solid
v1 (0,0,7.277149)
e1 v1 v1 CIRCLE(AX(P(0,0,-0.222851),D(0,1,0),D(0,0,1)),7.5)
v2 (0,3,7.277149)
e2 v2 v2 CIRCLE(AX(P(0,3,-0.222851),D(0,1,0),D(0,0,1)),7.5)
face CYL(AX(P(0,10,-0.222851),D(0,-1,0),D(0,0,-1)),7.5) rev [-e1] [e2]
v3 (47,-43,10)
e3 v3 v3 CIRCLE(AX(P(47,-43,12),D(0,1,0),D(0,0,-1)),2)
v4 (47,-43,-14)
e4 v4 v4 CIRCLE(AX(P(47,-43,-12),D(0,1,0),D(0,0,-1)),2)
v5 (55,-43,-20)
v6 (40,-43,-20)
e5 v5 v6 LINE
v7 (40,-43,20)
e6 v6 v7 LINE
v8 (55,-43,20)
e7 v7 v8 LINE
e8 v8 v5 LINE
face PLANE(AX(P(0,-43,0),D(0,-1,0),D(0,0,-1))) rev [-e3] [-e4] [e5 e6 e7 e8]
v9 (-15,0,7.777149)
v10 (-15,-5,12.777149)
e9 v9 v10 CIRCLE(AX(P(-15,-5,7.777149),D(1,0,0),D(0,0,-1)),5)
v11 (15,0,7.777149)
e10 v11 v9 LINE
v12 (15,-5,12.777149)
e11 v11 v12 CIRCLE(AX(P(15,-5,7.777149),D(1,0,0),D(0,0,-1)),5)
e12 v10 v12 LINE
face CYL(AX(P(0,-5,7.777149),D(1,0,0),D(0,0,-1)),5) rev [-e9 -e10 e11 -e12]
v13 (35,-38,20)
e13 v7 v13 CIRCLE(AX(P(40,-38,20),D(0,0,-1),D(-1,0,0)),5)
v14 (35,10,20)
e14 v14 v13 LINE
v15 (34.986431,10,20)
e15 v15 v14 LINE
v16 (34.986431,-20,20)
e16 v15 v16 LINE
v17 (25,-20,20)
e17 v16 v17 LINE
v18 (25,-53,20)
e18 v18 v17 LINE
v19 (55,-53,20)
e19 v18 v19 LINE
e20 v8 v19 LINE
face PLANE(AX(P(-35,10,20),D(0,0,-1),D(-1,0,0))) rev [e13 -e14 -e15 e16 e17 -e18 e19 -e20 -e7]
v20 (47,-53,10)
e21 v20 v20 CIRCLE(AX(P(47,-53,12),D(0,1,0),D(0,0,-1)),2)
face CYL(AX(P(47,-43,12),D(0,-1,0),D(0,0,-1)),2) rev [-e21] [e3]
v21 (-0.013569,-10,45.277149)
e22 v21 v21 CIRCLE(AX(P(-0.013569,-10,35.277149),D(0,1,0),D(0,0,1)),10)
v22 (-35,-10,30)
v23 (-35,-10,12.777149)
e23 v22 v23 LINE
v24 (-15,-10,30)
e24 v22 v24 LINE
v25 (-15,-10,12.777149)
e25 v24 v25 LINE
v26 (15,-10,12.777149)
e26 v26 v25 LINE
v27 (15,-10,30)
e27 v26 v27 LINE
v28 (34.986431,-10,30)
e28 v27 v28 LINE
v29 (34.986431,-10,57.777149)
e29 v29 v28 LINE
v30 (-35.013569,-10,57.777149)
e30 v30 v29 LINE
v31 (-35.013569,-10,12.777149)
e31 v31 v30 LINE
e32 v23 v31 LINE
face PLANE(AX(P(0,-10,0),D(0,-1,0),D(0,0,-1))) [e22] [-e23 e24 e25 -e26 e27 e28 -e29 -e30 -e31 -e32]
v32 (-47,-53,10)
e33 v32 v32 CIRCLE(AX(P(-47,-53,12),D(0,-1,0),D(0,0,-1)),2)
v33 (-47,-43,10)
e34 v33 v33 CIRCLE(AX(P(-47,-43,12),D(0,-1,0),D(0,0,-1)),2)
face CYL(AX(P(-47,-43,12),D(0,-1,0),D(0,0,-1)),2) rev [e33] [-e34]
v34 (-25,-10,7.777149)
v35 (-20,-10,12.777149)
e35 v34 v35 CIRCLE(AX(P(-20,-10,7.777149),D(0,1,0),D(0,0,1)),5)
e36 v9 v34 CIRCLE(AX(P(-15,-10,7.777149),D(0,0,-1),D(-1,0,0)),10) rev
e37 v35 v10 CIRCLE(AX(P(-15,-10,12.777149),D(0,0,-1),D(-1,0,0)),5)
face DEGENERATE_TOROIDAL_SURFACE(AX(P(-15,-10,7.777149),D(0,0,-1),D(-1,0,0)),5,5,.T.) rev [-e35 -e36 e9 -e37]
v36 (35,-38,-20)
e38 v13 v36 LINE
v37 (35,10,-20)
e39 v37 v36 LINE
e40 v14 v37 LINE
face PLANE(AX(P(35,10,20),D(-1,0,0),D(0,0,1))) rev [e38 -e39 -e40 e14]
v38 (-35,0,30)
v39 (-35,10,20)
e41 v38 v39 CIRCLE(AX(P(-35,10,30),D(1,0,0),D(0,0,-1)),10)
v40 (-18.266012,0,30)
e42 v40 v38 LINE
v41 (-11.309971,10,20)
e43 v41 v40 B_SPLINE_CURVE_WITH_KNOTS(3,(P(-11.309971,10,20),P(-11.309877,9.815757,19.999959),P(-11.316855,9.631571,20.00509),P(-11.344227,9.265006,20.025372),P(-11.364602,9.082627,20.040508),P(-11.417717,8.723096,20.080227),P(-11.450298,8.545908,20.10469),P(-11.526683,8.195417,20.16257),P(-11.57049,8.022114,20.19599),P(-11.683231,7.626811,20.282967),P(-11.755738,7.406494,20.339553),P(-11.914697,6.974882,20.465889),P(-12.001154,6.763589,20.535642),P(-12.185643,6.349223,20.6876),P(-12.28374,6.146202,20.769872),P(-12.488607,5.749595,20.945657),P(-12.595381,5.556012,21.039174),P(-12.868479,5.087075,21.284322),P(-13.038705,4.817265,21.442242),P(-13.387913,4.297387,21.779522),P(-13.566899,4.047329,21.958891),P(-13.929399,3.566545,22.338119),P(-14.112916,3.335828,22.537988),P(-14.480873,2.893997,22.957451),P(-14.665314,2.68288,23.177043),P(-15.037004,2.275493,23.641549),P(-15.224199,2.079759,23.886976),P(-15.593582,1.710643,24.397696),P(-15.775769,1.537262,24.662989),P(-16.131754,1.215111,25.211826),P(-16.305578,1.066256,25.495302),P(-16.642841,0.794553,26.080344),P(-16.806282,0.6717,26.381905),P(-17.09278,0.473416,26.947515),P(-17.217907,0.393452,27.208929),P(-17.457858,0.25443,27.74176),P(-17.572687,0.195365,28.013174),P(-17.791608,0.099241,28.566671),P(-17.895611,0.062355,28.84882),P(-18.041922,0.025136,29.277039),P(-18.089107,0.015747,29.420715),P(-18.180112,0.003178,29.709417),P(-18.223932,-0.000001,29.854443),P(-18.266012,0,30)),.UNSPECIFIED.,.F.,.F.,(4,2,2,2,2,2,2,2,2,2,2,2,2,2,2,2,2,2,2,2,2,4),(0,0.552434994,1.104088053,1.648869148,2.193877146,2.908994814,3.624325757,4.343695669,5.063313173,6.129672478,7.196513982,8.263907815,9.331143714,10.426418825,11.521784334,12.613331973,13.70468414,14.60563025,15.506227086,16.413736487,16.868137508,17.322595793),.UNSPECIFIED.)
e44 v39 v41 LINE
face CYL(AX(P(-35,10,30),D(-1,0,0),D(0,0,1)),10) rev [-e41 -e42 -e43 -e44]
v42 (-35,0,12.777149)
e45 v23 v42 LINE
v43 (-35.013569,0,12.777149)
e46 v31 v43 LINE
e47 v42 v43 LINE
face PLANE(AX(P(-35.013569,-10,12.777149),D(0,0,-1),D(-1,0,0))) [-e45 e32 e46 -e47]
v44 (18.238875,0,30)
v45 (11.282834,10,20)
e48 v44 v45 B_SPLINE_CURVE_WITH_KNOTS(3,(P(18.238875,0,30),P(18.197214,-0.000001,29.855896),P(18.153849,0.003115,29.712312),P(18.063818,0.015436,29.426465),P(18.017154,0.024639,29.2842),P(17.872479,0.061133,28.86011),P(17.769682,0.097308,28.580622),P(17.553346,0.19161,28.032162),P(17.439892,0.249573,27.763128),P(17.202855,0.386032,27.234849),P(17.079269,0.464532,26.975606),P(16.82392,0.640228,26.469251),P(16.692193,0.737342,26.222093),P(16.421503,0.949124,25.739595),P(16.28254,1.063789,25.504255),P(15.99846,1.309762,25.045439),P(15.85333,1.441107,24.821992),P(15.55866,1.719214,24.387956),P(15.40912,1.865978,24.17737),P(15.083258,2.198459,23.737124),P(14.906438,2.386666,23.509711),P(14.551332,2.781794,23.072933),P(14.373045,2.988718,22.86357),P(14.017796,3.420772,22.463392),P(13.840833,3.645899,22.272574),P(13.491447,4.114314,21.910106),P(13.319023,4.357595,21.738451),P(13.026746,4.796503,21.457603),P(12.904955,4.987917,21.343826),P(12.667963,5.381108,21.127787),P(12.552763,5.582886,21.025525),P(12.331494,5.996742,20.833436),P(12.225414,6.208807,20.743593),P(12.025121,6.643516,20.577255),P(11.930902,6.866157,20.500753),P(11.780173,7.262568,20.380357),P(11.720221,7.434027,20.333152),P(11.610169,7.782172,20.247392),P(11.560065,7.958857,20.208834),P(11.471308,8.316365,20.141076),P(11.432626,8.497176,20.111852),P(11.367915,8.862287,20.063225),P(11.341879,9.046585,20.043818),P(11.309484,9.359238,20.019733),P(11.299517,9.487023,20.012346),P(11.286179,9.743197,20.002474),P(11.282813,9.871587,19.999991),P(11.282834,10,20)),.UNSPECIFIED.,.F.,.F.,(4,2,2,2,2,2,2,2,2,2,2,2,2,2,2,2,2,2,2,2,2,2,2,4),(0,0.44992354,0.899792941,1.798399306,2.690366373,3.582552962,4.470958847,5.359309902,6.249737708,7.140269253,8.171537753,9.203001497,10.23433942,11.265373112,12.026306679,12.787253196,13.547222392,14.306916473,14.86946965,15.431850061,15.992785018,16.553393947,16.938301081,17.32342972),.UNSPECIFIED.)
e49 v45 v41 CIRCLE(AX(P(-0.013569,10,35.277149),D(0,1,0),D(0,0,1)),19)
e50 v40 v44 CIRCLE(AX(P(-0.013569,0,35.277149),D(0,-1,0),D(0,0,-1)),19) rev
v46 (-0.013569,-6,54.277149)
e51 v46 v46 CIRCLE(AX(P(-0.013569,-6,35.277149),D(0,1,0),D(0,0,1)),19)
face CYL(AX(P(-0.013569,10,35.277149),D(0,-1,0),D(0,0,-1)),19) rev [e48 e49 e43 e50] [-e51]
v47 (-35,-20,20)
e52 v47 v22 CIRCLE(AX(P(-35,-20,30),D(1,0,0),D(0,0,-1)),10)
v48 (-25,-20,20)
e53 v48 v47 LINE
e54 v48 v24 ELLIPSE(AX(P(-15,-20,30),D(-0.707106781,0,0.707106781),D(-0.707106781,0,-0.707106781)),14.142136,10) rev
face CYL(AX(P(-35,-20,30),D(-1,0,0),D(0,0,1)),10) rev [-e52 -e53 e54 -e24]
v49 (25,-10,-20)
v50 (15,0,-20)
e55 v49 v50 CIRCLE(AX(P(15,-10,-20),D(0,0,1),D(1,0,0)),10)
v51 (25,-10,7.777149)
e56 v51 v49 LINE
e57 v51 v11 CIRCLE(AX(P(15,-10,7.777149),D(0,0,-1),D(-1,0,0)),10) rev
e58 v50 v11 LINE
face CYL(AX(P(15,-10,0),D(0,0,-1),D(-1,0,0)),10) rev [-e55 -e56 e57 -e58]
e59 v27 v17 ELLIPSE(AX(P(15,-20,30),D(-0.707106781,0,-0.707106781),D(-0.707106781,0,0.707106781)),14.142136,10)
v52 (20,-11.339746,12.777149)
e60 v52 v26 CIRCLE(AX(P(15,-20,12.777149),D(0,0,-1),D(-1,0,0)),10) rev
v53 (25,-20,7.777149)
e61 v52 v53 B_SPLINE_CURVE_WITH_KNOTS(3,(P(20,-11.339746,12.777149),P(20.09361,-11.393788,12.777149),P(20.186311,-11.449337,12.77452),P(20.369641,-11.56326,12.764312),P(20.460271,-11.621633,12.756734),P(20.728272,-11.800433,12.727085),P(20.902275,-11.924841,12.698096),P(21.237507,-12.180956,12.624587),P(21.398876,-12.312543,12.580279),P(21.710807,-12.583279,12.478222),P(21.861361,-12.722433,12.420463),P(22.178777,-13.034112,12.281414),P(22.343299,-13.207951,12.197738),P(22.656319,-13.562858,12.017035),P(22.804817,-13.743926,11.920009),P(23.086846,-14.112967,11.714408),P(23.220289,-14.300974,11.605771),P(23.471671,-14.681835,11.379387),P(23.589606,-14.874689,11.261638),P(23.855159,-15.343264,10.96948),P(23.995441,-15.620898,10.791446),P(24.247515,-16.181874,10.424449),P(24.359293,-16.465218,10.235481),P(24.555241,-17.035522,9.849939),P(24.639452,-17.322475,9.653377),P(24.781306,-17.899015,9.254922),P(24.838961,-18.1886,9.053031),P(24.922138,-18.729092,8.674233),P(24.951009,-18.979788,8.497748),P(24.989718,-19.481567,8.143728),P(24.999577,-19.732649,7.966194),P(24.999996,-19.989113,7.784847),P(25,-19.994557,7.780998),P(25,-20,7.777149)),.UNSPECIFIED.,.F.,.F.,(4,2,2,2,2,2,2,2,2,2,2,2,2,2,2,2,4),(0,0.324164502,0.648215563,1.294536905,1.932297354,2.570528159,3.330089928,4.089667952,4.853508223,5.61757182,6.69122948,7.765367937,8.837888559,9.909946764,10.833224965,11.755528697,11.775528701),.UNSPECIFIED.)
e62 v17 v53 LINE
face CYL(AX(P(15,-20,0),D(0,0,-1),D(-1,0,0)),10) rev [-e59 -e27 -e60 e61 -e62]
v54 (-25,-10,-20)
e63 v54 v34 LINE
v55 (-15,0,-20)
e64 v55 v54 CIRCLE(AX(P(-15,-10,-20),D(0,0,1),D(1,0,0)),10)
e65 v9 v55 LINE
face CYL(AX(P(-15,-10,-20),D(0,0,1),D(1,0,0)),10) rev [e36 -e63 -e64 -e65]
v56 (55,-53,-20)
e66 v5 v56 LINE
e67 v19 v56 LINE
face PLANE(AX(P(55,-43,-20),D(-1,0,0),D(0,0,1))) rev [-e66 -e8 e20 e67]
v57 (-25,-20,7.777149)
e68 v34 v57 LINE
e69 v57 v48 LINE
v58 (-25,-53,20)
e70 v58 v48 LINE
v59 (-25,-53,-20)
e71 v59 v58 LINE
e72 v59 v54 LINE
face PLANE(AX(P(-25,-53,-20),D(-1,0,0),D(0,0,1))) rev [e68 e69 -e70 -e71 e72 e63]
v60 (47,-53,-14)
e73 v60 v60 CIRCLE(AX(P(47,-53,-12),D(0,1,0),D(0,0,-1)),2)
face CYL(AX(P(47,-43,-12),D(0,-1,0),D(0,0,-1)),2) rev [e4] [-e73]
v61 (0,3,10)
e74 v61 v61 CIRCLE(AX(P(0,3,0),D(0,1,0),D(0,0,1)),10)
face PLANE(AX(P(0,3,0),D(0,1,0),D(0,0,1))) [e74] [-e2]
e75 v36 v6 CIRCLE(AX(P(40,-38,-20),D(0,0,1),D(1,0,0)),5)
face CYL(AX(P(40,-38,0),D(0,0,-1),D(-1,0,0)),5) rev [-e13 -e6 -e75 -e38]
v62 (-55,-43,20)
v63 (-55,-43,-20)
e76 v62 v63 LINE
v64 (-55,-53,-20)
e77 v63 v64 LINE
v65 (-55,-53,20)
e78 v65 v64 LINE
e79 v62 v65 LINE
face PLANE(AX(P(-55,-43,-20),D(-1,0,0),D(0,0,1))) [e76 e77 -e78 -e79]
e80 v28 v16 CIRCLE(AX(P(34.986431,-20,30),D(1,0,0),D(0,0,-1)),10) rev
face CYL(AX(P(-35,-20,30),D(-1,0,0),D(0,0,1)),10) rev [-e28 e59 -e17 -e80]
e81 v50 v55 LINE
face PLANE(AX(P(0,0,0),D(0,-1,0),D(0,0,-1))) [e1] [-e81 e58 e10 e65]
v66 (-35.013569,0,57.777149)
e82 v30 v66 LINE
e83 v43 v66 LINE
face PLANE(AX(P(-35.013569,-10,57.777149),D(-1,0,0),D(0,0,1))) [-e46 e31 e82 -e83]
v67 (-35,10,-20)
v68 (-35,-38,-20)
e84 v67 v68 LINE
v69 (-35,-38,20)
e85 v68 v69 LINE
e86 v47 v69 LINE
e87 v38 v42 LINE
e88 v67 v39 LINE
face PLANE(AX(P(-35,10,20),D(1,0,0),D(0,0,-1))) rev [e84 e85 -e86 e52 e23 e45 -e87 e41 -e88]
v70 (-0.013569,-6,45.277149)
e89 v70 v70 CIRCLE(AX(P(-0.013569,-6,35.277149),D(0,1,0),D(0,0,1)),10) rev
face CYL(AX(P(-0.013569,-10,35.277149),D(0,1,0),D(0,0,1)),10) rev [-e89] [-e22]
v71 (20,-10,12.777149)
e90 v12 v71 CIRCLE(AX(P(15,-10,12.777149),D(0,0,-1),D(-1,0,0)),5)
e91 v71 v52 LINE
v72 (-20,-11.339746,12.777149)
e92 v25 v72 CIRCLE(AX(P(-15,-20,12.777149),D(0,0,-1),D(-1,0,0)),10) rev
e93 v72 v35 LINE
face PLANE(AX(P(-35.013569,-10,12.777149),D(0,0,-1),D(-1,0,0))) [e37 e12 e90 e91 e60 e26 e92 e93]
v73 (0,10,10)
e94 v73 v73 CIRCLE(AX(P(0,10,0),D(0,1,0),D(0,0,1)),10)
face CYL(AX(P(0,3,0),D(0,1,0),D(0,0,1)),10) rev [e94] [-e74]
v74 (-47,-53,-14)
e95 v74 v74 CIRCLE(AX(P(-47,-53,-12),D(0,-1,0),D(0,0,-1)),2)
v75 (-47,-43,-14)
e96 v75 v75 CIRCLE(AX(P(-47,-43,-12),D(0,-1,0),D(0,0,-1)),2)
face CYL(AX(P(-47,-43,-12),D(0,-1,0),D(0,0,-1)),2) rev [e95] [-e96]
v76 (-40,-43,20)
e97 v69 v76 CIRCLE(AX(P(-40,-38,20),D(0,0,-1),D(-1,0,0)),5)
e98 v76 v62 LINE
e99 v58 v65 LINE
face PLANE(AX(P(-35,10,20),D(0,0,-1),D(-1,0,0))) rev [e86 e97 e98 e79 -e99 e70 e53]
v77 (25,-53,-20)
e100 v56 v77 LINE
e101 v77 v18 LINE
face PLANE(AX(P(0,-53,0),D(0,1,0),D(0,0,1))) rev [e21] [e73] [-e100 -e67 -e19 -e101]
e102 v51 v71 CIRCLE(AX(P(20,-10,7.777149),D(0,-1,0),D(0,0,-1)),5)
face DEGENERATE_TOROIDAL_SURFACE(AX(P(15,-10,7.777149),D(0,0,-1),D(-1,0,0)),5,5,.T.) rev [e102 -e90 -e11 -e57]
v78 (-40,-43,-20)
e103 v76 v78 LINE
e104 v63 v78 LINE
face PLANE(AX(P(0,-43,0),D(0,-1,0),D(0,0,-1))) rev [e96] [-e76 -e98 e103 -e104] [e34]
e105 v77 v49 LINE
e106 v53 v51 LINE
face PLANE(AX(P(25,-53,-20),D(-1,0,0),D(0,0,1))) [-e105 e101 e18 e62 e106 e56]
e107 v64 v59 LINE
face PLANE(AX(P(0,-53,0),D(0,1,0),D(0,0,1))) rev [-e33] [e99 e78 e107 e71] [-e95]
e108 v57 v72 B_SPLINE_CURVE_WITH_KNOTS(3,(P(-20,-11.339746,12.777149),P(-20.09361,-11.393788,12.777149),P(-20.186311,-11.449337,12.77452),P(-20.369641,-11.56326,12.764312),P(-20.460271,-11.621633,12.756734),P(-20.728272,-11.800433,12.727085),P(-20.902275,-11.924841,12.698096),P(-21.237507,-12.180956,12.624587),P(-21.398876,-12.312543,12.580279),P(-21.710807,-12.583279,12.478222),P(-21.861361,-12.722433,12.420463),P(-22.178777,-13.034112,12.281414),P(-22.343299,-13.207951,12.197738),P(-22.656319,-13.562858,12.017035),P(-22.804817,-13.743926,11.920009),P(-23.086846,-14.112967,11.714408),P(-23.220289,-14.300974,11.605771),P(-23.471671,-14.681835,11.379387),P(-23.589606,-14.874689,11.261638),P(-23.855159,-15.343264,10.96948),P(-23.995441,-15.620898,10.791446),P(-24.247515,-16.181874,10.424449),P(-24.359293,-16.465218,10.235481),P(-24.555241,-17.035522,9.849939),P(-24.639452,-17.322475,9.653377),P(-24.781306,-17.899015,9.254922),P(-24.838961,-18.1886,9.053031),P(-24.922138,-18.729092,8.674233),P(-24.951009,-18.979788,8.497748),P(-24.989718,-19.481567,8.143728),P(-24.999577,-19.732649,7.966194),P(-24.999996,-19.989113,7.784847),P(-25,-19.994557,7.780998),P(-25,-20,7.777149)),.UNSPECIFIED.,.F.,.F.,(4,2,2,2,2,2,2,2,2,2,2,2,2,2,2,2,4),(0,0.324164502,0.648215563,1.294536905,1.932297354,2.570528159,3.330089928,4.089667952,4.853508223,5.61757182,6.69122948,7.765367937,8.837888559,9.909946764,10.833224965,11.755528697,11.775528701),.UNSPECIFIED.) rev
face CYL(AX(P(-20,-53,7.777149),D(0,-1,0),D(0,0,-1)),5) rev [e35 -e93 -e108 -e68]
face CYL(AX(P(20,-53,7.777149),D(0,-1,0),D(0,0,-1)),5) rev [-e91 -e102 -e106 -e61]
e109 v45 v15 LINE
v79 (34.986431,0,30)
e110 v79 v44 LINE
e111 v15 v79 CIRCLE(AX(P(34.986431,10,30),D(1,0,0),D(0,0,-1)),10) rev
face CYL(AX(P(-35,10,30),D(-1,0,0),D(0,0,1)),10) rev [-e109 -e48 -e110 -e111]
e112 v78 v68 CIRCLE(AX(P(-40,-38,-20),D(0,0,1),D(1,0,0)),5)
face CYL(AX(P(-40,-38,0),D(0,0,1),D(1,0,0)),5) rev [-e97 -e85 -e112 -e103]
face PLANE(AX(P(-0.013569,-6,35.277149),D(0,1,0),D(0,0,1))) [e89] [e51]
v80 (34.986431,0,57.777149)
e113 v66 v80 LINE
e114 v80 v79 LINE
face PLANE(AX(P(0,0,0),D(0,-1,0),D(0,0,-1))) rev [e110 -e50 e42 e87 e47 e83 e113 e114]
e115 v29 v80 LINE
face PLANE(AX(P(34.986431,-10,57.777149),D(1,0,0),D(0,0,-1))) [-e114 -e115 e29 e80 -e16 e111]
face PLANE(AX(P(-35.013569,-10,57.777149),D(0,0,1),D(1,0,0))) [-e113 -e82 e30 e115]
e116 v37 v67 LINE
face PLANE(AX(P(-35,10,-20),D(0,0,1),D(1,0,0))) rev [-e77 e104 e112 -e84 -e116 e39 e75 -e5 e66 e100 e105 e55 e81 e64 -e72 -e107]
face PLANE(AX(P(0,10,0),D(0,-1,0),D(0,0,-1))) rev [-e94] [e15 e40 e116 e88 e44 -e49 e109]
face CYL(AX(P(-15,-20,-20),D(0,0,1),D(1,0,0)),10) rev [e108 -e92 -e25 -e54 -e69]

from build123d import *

# Parameters (mm, degrees)
SKETCH1_W               = 70
SKETCH1_H               = 40
SKETCH1_R               = 7.5
BOSS_EXTRUDE2_DEPTH     = 10
SKETCH2_R               = 10
CUT_EXTRUDE1_DEPTH      = 7
SKETCH3_W               = 10
SKETCH3_H               = 40
BOSS_EXTRUDE3_DEPTH     = 53
SKETCH5_W               = 30
SKETCH5_H               = 40
BOSS_EXTRUDE4_DEPTH     = 10
SKETCH7_R               = 2
CUT_EXTRUDE2_DEPTH      = 10
FILLET5_R               = 5
FILLET6_R               = 5
SKETCH10_W              = 70
SKETCH10_H              = 45
SKETCH10_R              = 10
BOSS_EXTRUDE9_DEPTH     = 10
CUT_EXTRUDE3_DEPTH      = 96.771597908
CUT_EXTRUDE3_DEPTH_BACK = 6
SKETCH11_R              = 19
FILLET7_R               = 10
FILLET8_R               = 10
FILLET9_R               = 5


with BuildPart() as part:
    # Sketch1 → Boss-Extrude2 (new body)
    with BuildSketch(Plane(origin=(0, 0, 0), x_dir=(1, 0, 0), z_dir=(0, 1, 0))):
        Rectangle(SKETCH1_W, SKETCH1_H)
        with Locations(Location((0, 0.222850833, 0), (0, 0, 270))):
            Circle(SKETCH1_R, mode=Mode.SUBTRACT)
    extrude(amount=BOSS_EXTRUDE2_DEPTH)

    # Sketch2 → Cut-Extrude1 (cut)
    with BuildSketch(Plane(origin=(0, 10, 0), x_dir=(1, 0, 0), z_dir=(0, 1, 0))):
        with Locations(Location((0, 0, 0), (0, 0, 270))):
            Circle(SKETCH2_R)
    extrude(amount=-CUT_EXTRUDE1_DEPTH, mode=Mode.SUBTRACT)

    # Sketch3 → Boss-Extrude3 (add)
    with BuildSketch(Plane.XZ):
        with Locations((-30, 0)):
            Rectangle(SKETCH3_W, SKETCH3_H)
    boss_extrude3 = extrude(amount=BOSS_EXTRUDE3_DEPTH)

    # Sketch5 → Boss-Extrude4 (add)
    with BuildSketch(Plane.XZ.offset(53)):
        with Locations((-40, 0)):
            Rectangle(SKETCH5_W, SKETCH5_H)
    boss_extrude4 = extrude(amount=-BOSS_EXTRUDE4_DEPTH)

    # Sketch7 → Cut-Extrude2 (cut)
    with BuildSketch(Plane.XZ.offset(53)):
        with Locations(Location((-47, 12, 0), (0, 0, 270))):
            Circle(SKETCH7_R)
        with Locations(Location((-47, -12, 0), (0, 0, 270))):
            Circle(SKETCH7_R)
    cut_extrude2 = extrude(amount=-CUT_EXTRUDE2_DEPTH, mode=Mode.SUBTRACT)

    # Fillet5
    fillet5_edges = [part.edges().sort_by_distance(p)[0] for p in [
        (-35, -43, 0),
    ]]
    fillet(fillet5_edges, radius=FILLET5_R)

    # Mirror10: Boss-Extrude3, Boss-Extrude4, Cut-Extrude2 across plane
    add(boss_extrude3.mirror(Plane(origin=(0, 0, 0), x_dir=(0, 0, 1), z_dir=(1, 0, 0))))
    add(boss_extrude4.mirror(Plane(origin=(0, 0, 0), x_dir=(0, 0, 1), z_dir=(1, 0, 0))))
    add(cut_extrude2.mirror(Plane(origin=(0, 0, 0), x_dir=(0, 0, 1), z_dir=(1, 0, 0))), mode=Mode.SUBTRACT)

    # Fillet6
    fillet6_edges = [part.edges().sort_by_distance(p)[0] for p in [
        (35, -43, 0),
    ]]
    fillet(fillet6_edges, radius=FILLET6_R)

    # Sketch10 → Boss-Extrude9 (add)
    with BuildSketch(Plane(origin=(0, 0, 0), x_dir=(1, 0, 0), z_dir=(0, 1, 0))):
        with Locations((-0.013568797, -35.277149167)):
            Rectangle(SKETCH10_W, SKETCH10_H)
        with Locations(Location((-0.013568797, -35.277149167, 0), (0, 0, 270))):
            Circle(SKETCH10_R, mode=Mode.SUBTRACT)
    extrude(amount=-BOSS_EXTRUDE9_DEPTH)

    # Sketch11 → Cut-Extrude3 (cut, two sides: drawn at the far end of the back side and taken through both)
    with BuildSketch(Plane(origin=(0, 0, 0), x_dir=(1, 0, 0), z_dir=(0, 1, 0)).offset(-CUT_EXTRUDE3_DEPTH_BACK)):
        with Locations(Location((-0.013568797, -35.277149167, 0), (0, 0, 126.480381765))):
            Circle(SKETCH11_R)
    extrude(amount=CUT_EXTRUDE3_DEPTH + CUT_EXTRUDE3_DEPTH_BACK, mode=Mode.SUBTRACT)

    # Fillet7
    # the kernel refuses this fillet: 10 mm, written as the material it adds along each edge
    with BuildSketch(Plane(origin=(-35, -10, 20), x_dir=(0, 0, 1), z_dir=(1, 0, 0))) as fillet7_piece_1:
        with BuildLine():
            CenterArc((FILLET7_R, FILLET7_R), FILLET7_R, 180, 90)
            Line((0, FILLET7_R), (0, 0))
            Line((0, 0), (FILLET7_R, 0))
        make_face()
    extrude(amount=10)
    with BuildSketch(Plane(origin=(25, -10, 20), x_dir=(0, -1, 0), z_dir=(1, 0, 0))) as fillet7_piece_2:
        with BuildLine():
            CenterArc((FILLET7_R, -FILLET7_R), FILLET7_R, 90, 90)
            Line((0, -FILLET7_R), (0, 0))
            Line((0, 0), (FILLET7_R, 0))
        make_face()
    extrude(amount=9.986431203)
    with BuildSketch(Plane(origin=(-13.717166125, 0, 20), x_dir=(0, 1, 0), z_dir=(1, 0, 0))) as fillet7_piece_3_section:
        with BuildLine():
            CenterArc((FILLET7_R, FILLET7_R), FILLET7_R, 180, 90)
            Line((0, FILLET7_R), (0, 0))
            Line((0, 0), (FILLET7_R, 0))
        make_face()
    fillet7_piece_3 = extrude(amount=48.703597328, mode=Mode.PRIVATE)
    fillet7_piece_3 = fillet7_piece_3 - Plane(origin=(-0.013568797, 3.73467358, 35.277149167), x_dir=(-0.5945475090531093, 0, -0.8040604824755057), z_dir=(0, -1, 0)) * Cylinder(19, 138, mode=Mode.PRIVATE)
    add(fillet7_piece_3)
    with BuildSketch(Plane(origin=(-35, 0, 20), x_dir=(0, 0, 1), z_dir=(1, 0, 0))) as fillet7_piece_4_section:
        with BuildLine():
            CenterArc((FILLET7_R, -FILLET7_R), FILLET7_R, 90, 90)
            Line((0, -FILLET7_R), (0, 0))
            Line((0, 0), (FILLET7_R, 0))
        make_face()
    fillet7_piece_4 = extrude(amount=48.690028531, mode=Mode.PRIVATE)
    fillet7_piece_4 = fillet7_piece_4 - Plane(origin=(-0.013568797, 2.378365403, 35.277149167), x_dir=(-0.5945475090531093, 0, -0.8040604824755057), z_dir=(0, -1, 0)) * Cylinder(19, 138, mode=Mode.PRIVATE)
    add(fillet7_piece_4)

    # Fillet8
    fillet8_edges = [part.edges().sort_by_distance(p)[0] for p in [
        (25, 0, -3.611425416),
        (-25, 0, -3.611425416),
        (-25, -10, 21.388574584),
        (25, -10, 21.388574584),
    ]]
    fillet(fillet8_edges, radius=FILLET8_R)

    # Fillet9
    fillet9_edges = [part.edges().sort_by_distance(p)[0] for p in [
        (0, 0, 12.777149167),
        (-22.071067812, -2.928932188, 12.777149167),
        (22.071067812, -2.928932188, 12.777149167),
        (25, -15, 12.777149167),
        (-25, -15, 12.777149167),
    ]]
    fillet(fillet9_edges, radius=FILLET9_R)


solid = part.part
